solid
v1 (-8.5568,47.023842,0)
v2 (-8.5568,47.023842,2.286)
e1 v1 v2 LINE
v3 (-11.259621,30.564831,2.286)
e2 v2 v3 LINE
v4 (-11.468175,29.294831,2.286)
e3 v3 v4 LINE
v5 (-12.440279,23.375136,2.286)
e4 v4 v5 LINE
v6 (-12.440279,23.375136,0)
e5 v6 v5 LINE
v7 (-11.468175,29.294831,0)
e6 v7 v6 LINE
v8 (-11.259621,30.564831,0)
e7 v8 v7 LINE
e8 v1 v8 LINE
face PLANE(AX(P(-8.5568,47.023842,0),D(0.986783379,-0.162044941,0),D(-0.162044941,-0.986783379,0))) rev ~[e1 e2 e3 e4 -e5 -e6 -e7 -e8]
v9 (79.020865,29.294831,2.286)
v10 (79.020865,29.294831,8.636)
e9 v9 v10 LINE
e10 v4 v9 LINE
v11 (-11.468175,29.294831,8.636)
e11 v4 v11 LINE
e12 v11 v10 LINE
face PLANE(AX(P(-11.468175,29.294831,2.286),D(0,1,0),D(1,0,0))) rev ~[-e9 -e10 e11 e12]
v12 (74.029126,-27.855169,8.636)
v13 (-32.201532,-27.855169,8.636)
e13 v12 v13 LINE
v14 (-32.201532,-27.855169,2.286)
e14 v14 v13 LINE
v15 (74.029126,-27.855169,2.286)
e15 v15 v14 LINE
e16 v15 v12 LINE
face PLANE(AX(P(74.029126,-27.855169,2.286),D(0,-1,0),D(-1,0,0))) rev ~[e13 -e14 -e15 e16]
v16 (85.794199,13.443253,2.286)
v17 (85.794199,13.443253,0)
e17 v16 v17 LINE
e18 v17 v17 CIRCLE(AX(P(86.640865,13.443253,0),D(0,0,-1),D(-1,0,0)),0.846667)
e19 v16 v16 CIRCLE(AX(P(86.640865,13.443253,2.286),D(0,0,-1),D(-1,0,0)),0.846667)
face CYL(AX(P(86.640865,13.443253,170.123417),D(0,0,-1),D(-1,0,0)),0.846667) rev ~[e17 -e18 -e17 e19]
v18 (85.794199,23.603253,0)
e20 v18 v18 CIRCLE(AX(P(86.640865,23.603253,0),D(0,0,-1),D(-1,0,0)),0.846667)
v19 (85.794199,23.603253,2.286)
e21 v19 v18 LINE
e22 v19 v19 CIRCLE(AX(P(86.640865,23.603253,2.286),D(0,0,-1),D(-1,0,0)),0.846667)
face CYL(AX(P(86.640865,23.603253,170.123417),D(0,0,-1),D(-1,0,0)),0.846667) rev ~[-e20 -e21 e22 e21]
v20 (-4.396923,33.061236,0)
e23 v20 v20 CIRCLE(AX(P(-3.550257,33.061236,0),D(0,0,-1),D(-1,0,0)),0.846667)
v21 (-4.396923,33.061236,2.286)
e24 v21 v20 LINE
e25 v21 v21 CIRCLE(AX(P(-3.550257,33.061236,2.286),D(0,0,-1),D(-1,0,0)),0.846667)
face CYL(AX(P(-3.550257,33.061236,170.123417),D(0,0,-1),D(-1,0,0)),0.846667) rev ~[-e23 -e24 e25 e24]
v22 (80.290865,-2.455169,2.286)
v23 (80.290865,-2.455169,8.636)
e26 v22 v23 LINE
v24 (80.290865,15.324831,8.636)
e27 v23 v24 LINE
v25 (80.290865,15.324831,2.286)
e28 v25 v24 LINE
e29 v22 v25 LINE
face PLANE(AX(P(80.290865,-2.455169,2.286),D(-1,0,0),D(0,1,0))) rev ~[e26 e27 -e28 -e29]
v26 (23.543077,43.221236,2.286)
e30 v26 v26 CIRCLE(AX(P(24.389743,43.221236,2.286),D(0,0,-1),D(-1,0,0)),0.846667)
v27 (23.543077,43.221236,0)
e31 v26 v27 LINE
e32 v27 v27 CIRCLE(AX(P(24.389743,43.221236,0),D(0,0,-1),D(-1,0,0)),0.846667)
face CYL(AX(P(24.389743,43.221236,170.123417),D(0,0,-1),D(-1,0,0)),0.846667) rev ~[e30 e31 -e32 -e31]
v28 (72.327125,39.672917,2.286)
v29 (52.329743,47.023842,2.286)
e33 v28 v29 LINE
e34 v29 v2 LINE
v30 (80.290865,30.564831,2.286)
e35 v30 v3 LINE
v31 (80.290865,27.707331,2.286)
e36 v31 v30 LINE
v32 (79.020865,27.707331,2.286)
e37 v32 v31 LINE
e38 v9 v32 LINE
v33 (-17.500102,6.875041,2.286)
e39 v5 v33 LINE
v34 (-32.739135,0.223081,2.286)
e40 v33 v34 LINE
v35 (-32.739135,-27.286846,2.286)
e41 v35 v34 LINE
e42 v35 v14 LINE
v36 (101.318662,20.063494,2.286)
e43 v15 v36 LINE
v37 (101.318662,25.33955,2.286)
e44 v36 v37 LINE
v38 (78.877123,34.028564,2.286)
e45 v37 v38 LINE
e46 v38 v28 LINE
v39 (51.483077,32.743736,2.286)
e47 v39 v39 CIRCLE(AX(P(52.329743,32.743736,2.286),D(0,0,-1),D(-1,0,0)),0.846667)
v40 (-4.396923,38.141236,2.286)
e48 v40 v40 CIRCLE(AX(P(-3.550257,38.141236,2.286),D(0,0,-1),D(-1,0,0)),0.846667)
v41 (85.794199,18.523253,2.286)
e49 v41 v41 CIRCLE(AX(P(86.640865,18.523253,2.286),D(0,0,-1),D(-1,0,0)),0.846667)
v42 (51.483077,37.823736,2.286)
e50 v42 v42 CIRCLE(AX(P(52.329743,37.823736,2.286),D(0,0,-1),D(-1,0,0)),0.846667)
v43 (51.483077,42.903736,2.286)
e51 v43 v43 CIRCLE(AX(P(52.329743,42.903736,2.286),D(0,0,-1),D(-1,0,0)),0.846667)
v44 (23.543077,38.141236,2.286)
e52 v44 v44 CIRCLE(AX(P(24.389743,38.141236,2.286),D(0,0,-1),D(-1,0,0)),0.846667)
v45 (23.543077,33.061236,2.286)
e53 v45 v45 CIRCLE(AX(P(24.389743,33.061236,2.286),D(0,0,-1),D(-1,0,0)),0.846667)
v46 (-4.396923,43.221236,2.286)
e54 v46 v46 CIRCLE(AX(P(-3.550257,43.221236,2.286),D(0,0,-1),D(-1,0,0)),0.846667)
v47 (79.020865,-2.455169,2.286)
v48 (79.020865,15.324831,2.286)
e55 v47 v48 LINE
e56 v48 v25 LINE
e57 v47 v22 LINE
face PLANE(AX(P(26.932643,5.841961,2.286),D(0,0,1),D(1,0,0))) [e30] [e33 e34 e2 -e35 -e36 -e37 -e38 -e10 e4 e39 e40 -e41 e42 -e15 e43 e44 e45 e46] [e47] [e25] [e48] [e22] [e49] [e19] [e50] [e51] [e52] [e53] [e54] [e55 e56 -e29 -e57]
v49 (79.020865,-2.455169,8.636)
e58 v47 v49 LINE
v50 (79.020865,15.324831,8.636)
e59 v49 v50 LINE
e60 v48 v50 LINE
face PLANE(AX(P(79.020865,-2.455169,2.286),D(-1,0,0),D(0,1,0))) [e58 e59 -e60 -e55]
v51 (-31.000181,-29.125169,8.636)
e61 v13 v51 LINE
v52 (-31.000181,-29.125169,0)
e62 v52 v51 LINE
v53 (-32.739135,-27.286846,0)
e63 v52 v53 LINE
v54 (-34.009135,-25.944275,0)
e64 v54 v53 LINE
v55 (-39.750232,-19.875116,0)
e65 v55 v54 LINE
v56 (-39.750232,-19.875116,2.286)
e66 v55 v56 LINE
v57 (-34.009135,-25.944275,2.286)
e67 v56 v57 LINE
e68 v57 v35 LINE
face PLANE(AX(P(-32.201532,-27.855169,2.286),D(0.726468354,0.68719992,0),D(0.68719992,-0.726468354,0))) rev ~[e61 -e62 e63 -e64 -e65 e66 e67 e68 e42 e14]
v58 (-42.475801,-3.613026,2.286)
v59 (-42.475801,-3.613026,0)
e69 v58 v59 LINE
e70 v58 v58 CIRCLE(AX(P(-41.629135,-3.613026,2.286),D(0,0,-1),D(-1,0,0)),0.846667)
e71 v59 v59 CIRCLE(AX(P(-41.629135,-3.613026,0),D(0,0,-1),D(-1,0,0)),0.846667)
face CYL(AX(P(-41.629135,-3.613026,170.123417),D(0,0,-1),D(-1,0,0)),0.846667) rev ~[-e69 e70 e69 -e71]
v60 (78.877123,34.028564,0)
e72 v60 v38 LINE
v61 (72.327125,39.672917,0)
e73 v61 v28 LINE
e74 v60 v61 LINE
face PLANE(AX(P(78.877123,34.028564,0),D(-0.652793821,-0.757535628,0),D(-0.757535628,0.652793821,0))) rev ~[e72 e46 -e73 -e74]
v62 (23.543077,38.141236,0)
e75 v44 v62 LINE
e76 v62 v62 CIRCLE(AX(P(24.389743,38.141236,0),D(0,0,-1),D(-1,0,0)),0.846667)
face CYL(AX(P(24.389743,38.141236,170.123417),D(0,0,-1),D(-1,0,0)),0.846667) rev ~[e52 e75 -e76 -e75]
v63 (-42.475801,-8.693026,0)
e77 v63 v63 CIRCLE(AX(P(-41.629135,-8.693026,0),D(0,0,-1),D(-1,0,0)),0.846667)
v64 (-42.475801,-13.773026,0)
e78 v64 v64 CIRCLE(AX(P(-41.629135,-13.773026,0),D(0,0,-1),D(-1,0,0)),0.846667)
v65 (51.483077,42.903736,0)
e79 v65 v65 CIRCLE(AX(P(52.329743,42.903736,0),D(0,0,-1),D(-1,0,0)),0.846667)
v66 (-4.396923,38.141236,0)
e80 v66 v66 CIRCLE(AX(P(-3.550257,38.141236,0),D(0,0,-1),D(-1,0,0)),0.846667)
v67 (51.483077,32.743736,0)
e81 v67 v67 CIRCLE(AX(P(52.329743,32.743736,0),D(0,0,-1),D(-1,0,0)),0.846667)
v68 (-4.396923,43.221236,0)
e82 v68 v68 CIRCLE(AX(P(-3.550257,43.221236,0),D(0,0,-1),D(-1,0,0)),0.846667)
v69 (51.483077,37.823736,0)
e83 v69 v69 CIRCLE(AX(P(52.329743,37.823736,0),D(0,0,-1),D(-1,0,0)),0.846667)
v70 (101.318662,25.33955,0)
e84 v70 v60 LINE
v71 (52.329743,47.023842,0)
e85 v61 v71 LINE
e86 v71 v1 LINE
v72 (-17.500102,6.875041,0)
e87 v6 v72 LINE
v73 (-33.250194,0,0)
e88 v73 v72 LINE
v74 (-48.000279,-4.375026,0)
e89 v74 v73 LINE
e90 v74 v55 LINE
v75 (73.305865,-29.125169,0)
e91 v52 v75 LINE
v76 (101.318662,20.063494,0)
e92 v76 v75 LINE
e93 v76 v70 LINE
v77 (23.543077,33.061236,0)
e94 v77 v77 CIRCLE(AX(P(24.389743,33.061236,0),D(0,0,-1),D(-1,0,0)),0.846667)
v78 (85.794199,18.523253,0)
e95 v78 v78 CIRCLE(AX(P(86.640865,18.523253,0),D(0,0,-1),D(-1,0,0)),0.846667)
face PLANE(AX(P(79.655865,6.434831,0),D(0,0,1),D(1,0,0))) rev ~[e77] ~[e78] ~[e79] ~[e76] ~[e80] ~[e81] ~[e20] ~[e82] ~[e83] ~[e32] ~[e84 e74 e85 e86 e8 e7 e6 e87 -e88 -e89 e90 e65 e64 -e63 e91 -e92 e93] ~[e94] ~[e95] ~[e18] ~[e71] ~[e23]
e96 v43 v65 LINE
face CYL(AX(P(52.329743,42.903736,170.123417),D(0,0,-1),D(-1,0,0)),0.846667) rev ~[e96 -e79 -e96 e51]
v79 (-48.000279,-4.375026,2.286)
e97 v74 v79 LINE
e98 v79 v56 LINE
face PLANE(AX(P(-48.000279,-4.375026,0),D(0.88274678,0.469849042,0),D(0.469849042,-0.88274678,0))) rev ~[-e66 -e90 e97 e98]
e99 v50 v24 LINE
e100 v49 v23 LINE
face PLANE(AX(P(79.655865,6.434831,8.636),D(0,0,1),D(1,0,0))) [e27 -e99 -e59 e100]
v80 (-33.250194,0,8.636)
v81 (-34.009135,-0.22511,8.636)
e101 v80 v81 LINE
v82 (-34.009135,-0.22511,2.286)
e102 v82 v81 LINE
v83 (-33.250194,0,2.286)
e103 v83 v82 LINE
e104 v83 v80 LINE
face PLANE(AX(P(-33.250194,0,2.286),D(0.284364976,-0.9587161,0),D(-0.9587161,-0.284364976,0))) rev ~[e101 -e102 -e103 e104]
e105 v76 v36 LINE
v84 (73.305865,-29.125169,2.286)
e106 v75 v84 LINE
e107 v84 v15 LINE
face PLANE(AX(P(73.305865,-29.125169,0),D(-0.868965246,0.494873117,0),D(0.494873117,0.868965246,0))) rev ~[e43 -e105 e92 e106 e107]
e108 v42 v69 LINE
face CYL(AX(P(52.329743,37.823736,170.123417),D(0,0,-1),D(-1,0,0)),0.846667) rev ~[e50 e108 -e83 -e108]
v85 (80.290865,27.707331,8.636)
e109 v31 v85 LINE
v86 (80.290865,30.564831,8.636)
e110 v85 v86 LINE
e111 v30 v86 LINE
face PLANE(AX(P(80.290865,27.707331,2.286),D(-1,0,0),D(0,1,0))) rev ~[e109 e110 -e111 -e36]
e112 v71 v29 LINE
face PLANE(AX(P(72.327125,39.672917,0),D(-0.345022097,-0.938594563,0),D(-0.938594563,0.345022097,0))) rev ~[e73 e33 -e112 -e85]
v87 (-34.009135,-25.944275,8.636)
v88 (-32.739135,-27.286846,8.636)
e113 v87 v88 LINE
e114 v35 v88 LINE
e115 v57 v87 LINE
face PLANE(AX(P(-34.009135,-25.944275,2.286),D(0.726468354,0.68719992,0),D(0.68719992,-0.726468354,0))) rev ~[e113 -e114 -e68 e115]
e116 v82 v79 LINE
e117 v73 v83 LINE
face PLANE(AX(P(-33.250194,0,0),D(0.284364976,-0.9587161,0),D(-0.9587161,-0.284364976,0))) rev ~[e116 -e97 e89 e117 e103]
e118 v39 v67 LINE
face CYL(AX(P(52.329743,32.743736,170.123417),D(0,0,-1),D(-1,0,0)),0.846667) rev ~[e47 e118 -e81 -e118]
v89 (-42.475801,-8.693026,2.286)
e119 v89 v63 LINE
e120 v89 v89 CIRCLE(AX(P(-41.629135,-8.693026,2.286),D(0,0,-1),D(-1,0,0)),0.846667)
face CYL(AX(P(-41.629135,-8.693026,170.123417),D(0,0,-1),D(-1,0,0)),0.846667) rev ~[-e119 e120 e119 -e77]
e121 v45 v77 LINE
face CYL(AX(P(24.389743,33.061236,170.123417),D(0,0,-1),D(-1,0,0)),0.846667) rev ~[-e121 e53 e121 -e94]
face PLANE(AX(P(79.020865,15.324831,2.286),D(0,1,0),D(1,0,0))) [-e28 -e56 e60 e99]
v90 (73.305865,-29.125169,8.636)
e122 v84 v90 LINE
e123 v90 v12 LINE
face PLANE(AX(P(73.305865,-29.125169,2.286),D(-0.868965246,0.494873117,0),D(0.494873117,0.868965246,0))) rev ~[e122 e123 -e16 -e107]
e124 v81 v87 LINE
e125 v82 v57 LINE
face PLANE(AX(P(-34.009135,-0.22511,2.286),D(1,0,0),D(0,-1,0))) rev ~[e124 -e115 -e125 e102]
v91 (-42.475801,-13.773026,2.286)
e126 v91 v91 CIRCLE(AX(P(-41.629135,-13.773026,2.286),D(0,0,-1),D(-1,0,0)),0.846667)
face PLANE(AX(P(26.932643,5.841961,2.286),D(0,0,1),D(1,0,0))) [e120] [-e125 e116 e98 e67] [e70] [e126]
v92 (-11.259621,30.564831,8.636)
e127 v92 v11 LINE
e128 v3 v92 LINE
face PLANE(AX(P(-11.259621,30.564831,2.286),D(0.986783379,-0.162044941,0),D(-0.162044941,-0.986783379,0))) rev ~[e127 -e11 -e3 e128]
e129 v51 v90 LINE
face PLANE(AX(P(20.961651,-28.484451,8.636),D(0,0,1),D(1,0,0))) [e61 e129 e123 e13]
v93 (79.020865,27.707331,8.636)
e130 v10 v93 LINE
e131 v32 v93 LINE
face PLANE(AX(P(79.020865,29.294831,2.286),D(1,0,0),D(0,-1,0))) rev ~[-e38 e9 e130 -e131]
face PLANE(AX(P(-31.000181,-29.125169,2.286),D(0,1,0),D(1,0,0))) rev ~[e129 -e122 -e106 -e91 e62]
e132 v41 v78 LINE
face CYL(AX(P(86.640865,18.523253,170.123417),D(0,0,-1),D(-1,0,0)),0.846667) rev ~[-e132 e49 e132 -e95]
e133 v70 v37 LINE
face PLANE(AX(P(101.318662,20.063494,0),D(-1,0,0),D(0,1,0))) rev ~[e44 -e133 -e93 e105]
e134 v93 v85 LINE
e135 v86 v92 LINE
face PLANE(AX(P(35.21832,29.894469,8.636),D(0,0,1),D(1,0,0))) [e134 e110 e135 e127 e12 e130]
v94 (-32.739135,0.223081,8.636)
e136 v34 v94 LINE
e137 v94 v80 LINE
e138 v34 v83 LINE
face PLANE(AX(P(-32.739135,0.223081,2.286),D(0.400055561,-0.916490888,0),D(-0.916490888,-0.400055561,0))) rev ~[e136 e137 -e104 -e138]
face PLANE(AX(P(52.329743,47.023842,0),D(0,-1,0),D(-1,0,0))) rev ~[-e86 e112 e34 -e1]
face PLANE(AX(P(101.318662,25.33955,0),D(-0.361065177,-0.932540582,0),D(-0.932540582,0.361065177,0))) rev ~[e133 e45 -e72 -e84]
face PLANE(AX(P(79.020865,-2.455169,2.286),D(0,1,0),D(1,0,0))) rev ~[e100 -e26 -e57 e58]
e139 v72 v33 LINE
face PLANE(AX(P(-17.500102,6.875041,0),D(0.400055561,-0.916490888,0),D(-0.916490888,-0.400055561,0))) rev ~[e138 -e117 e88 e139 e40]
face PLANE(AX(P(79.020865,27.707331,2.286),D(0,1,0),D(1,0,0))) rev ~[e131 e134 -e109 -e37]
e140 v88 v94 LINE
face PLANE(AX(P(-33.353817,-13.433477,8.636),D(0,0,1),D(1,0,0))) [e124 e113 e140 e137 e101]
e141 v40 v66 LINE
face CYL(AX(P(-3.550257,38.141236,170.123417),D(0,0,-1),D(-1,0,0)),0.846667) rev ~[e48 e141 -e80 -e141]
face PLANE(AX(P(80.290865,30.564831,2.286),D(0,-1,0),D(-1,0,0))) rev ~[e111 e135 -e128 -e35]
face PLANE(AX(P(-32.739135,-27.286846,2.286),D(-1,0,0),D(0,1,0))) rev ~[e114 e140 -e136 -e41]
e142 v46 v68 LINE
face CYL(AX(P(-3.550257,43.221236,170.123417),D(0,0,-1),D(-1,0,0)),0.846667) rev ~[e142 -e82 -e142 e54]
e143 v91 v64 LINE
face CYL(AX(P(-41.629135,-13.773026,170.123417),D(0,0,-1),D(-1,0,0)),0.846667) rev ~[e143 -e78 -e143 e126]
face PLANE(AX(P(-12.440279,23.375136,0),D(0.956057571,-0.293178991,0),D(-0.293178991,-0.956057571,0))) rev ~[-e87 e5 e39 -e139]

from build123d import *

# Parameters (mm, degrees)
F1_DEPTH      = 2.286
F2_W          = 1.27
F2_H          = 17.78
F3_DEPTH      = 6.35
F3_DEPTH_BACK = 2.286
F4_D          = 1.6933333333


# Not quite as in the source:
# - a feature names something its author has since deleted; it is built from what else it names


with BuildPart() as f1:
    # F0 (on Top) → F1 (new body)
    with BuildSketch(Plane.XY):
        Polygon((-39.7502322496, -19.8751161248), (-31.0001806734, -29.1251689516), (73.3058652154, -29.1251689516), (101.3186621261, 20.063493978), (101.3186621261, 25.3395497125), (78.8771229202, 34.0285638846), (72.3271246897, 39.6729167182), (52.3297434038, 47.023841916), (50.4247434038, 47.023841916), (21.8864718038, 47.023841916), (19.9814718038, 47.023841916), (-8.5567997962, 47.023841916), (-12.4402794499, 23.3751358177), (-17.5001015898, 6.8750406358), (-33.2501941145, 0), (-48.0002794499, -4.3750257881), align=None)
    extrude(amount=F1_DEPTH)

    # F2 (on face) → F3 (join, two sides)
    with BuildSketch(Plane.XY.offset(2.286)) as f3_sk:
        with Locations((79.6558652154, 6.4348310484)):
            Rectangle(F2_W, F2_H)
        Polygon((-32.2015322451, -27.8551689516), (-31.0001806734, -29.1251689516), (73.3058652154, -29.1251689516), (74.0291264296, -27.8551689516), align=None)
        Polygon((80.2908652154, 30.5648310484), (-11.2596214034, 30.5648310484), (-11.4681748498, 29.2948310484), (79.0208652154, 29.2948310484), (79.0208652154, 27.7073310484), (80.2908652154, 27.7073310484), align=None)
        Polygon((-34.0091347846, -0.2251095453), (-34.0091347846, -25.944275189), (-32.7391347846, -27.2868463713), (-32.7391347846, 0.2230814616), (-33.2501941145, 0), align=None)
    extrude(amount=F3_DEPTH)
    extrude(f3_sk.sketch, amount=-F3_DEPTH_BACK)

    # F4 (through all)
    with Locations(Plane.XY.offset(2.286)):
        with Locations((-41.6291347846, -13.7730257881), (-41.6291347846, -8.6930257881), (-41.6291347846, -3.6130257881), (-3.5502565962, 43.2212361431), (-3.5502565962, 38.1412361431), (-3.5502565962, 33.0612361431), (24.3897434038, 43.2212361431), (24.3897434038, 38.1412361431), (24.3897434038, 33.0612361431), (52.3297434038, 42.9037361431), (52.3297434038, 37.8237361431), (52.3297434038, 32.7437361431), (86.6408652154, 23.6032530031), (86.6408652154, 18.5232530031), (86.6408652154, 13.4432530031)):
            Hole(F4_D / 2)


solid = f1.part
